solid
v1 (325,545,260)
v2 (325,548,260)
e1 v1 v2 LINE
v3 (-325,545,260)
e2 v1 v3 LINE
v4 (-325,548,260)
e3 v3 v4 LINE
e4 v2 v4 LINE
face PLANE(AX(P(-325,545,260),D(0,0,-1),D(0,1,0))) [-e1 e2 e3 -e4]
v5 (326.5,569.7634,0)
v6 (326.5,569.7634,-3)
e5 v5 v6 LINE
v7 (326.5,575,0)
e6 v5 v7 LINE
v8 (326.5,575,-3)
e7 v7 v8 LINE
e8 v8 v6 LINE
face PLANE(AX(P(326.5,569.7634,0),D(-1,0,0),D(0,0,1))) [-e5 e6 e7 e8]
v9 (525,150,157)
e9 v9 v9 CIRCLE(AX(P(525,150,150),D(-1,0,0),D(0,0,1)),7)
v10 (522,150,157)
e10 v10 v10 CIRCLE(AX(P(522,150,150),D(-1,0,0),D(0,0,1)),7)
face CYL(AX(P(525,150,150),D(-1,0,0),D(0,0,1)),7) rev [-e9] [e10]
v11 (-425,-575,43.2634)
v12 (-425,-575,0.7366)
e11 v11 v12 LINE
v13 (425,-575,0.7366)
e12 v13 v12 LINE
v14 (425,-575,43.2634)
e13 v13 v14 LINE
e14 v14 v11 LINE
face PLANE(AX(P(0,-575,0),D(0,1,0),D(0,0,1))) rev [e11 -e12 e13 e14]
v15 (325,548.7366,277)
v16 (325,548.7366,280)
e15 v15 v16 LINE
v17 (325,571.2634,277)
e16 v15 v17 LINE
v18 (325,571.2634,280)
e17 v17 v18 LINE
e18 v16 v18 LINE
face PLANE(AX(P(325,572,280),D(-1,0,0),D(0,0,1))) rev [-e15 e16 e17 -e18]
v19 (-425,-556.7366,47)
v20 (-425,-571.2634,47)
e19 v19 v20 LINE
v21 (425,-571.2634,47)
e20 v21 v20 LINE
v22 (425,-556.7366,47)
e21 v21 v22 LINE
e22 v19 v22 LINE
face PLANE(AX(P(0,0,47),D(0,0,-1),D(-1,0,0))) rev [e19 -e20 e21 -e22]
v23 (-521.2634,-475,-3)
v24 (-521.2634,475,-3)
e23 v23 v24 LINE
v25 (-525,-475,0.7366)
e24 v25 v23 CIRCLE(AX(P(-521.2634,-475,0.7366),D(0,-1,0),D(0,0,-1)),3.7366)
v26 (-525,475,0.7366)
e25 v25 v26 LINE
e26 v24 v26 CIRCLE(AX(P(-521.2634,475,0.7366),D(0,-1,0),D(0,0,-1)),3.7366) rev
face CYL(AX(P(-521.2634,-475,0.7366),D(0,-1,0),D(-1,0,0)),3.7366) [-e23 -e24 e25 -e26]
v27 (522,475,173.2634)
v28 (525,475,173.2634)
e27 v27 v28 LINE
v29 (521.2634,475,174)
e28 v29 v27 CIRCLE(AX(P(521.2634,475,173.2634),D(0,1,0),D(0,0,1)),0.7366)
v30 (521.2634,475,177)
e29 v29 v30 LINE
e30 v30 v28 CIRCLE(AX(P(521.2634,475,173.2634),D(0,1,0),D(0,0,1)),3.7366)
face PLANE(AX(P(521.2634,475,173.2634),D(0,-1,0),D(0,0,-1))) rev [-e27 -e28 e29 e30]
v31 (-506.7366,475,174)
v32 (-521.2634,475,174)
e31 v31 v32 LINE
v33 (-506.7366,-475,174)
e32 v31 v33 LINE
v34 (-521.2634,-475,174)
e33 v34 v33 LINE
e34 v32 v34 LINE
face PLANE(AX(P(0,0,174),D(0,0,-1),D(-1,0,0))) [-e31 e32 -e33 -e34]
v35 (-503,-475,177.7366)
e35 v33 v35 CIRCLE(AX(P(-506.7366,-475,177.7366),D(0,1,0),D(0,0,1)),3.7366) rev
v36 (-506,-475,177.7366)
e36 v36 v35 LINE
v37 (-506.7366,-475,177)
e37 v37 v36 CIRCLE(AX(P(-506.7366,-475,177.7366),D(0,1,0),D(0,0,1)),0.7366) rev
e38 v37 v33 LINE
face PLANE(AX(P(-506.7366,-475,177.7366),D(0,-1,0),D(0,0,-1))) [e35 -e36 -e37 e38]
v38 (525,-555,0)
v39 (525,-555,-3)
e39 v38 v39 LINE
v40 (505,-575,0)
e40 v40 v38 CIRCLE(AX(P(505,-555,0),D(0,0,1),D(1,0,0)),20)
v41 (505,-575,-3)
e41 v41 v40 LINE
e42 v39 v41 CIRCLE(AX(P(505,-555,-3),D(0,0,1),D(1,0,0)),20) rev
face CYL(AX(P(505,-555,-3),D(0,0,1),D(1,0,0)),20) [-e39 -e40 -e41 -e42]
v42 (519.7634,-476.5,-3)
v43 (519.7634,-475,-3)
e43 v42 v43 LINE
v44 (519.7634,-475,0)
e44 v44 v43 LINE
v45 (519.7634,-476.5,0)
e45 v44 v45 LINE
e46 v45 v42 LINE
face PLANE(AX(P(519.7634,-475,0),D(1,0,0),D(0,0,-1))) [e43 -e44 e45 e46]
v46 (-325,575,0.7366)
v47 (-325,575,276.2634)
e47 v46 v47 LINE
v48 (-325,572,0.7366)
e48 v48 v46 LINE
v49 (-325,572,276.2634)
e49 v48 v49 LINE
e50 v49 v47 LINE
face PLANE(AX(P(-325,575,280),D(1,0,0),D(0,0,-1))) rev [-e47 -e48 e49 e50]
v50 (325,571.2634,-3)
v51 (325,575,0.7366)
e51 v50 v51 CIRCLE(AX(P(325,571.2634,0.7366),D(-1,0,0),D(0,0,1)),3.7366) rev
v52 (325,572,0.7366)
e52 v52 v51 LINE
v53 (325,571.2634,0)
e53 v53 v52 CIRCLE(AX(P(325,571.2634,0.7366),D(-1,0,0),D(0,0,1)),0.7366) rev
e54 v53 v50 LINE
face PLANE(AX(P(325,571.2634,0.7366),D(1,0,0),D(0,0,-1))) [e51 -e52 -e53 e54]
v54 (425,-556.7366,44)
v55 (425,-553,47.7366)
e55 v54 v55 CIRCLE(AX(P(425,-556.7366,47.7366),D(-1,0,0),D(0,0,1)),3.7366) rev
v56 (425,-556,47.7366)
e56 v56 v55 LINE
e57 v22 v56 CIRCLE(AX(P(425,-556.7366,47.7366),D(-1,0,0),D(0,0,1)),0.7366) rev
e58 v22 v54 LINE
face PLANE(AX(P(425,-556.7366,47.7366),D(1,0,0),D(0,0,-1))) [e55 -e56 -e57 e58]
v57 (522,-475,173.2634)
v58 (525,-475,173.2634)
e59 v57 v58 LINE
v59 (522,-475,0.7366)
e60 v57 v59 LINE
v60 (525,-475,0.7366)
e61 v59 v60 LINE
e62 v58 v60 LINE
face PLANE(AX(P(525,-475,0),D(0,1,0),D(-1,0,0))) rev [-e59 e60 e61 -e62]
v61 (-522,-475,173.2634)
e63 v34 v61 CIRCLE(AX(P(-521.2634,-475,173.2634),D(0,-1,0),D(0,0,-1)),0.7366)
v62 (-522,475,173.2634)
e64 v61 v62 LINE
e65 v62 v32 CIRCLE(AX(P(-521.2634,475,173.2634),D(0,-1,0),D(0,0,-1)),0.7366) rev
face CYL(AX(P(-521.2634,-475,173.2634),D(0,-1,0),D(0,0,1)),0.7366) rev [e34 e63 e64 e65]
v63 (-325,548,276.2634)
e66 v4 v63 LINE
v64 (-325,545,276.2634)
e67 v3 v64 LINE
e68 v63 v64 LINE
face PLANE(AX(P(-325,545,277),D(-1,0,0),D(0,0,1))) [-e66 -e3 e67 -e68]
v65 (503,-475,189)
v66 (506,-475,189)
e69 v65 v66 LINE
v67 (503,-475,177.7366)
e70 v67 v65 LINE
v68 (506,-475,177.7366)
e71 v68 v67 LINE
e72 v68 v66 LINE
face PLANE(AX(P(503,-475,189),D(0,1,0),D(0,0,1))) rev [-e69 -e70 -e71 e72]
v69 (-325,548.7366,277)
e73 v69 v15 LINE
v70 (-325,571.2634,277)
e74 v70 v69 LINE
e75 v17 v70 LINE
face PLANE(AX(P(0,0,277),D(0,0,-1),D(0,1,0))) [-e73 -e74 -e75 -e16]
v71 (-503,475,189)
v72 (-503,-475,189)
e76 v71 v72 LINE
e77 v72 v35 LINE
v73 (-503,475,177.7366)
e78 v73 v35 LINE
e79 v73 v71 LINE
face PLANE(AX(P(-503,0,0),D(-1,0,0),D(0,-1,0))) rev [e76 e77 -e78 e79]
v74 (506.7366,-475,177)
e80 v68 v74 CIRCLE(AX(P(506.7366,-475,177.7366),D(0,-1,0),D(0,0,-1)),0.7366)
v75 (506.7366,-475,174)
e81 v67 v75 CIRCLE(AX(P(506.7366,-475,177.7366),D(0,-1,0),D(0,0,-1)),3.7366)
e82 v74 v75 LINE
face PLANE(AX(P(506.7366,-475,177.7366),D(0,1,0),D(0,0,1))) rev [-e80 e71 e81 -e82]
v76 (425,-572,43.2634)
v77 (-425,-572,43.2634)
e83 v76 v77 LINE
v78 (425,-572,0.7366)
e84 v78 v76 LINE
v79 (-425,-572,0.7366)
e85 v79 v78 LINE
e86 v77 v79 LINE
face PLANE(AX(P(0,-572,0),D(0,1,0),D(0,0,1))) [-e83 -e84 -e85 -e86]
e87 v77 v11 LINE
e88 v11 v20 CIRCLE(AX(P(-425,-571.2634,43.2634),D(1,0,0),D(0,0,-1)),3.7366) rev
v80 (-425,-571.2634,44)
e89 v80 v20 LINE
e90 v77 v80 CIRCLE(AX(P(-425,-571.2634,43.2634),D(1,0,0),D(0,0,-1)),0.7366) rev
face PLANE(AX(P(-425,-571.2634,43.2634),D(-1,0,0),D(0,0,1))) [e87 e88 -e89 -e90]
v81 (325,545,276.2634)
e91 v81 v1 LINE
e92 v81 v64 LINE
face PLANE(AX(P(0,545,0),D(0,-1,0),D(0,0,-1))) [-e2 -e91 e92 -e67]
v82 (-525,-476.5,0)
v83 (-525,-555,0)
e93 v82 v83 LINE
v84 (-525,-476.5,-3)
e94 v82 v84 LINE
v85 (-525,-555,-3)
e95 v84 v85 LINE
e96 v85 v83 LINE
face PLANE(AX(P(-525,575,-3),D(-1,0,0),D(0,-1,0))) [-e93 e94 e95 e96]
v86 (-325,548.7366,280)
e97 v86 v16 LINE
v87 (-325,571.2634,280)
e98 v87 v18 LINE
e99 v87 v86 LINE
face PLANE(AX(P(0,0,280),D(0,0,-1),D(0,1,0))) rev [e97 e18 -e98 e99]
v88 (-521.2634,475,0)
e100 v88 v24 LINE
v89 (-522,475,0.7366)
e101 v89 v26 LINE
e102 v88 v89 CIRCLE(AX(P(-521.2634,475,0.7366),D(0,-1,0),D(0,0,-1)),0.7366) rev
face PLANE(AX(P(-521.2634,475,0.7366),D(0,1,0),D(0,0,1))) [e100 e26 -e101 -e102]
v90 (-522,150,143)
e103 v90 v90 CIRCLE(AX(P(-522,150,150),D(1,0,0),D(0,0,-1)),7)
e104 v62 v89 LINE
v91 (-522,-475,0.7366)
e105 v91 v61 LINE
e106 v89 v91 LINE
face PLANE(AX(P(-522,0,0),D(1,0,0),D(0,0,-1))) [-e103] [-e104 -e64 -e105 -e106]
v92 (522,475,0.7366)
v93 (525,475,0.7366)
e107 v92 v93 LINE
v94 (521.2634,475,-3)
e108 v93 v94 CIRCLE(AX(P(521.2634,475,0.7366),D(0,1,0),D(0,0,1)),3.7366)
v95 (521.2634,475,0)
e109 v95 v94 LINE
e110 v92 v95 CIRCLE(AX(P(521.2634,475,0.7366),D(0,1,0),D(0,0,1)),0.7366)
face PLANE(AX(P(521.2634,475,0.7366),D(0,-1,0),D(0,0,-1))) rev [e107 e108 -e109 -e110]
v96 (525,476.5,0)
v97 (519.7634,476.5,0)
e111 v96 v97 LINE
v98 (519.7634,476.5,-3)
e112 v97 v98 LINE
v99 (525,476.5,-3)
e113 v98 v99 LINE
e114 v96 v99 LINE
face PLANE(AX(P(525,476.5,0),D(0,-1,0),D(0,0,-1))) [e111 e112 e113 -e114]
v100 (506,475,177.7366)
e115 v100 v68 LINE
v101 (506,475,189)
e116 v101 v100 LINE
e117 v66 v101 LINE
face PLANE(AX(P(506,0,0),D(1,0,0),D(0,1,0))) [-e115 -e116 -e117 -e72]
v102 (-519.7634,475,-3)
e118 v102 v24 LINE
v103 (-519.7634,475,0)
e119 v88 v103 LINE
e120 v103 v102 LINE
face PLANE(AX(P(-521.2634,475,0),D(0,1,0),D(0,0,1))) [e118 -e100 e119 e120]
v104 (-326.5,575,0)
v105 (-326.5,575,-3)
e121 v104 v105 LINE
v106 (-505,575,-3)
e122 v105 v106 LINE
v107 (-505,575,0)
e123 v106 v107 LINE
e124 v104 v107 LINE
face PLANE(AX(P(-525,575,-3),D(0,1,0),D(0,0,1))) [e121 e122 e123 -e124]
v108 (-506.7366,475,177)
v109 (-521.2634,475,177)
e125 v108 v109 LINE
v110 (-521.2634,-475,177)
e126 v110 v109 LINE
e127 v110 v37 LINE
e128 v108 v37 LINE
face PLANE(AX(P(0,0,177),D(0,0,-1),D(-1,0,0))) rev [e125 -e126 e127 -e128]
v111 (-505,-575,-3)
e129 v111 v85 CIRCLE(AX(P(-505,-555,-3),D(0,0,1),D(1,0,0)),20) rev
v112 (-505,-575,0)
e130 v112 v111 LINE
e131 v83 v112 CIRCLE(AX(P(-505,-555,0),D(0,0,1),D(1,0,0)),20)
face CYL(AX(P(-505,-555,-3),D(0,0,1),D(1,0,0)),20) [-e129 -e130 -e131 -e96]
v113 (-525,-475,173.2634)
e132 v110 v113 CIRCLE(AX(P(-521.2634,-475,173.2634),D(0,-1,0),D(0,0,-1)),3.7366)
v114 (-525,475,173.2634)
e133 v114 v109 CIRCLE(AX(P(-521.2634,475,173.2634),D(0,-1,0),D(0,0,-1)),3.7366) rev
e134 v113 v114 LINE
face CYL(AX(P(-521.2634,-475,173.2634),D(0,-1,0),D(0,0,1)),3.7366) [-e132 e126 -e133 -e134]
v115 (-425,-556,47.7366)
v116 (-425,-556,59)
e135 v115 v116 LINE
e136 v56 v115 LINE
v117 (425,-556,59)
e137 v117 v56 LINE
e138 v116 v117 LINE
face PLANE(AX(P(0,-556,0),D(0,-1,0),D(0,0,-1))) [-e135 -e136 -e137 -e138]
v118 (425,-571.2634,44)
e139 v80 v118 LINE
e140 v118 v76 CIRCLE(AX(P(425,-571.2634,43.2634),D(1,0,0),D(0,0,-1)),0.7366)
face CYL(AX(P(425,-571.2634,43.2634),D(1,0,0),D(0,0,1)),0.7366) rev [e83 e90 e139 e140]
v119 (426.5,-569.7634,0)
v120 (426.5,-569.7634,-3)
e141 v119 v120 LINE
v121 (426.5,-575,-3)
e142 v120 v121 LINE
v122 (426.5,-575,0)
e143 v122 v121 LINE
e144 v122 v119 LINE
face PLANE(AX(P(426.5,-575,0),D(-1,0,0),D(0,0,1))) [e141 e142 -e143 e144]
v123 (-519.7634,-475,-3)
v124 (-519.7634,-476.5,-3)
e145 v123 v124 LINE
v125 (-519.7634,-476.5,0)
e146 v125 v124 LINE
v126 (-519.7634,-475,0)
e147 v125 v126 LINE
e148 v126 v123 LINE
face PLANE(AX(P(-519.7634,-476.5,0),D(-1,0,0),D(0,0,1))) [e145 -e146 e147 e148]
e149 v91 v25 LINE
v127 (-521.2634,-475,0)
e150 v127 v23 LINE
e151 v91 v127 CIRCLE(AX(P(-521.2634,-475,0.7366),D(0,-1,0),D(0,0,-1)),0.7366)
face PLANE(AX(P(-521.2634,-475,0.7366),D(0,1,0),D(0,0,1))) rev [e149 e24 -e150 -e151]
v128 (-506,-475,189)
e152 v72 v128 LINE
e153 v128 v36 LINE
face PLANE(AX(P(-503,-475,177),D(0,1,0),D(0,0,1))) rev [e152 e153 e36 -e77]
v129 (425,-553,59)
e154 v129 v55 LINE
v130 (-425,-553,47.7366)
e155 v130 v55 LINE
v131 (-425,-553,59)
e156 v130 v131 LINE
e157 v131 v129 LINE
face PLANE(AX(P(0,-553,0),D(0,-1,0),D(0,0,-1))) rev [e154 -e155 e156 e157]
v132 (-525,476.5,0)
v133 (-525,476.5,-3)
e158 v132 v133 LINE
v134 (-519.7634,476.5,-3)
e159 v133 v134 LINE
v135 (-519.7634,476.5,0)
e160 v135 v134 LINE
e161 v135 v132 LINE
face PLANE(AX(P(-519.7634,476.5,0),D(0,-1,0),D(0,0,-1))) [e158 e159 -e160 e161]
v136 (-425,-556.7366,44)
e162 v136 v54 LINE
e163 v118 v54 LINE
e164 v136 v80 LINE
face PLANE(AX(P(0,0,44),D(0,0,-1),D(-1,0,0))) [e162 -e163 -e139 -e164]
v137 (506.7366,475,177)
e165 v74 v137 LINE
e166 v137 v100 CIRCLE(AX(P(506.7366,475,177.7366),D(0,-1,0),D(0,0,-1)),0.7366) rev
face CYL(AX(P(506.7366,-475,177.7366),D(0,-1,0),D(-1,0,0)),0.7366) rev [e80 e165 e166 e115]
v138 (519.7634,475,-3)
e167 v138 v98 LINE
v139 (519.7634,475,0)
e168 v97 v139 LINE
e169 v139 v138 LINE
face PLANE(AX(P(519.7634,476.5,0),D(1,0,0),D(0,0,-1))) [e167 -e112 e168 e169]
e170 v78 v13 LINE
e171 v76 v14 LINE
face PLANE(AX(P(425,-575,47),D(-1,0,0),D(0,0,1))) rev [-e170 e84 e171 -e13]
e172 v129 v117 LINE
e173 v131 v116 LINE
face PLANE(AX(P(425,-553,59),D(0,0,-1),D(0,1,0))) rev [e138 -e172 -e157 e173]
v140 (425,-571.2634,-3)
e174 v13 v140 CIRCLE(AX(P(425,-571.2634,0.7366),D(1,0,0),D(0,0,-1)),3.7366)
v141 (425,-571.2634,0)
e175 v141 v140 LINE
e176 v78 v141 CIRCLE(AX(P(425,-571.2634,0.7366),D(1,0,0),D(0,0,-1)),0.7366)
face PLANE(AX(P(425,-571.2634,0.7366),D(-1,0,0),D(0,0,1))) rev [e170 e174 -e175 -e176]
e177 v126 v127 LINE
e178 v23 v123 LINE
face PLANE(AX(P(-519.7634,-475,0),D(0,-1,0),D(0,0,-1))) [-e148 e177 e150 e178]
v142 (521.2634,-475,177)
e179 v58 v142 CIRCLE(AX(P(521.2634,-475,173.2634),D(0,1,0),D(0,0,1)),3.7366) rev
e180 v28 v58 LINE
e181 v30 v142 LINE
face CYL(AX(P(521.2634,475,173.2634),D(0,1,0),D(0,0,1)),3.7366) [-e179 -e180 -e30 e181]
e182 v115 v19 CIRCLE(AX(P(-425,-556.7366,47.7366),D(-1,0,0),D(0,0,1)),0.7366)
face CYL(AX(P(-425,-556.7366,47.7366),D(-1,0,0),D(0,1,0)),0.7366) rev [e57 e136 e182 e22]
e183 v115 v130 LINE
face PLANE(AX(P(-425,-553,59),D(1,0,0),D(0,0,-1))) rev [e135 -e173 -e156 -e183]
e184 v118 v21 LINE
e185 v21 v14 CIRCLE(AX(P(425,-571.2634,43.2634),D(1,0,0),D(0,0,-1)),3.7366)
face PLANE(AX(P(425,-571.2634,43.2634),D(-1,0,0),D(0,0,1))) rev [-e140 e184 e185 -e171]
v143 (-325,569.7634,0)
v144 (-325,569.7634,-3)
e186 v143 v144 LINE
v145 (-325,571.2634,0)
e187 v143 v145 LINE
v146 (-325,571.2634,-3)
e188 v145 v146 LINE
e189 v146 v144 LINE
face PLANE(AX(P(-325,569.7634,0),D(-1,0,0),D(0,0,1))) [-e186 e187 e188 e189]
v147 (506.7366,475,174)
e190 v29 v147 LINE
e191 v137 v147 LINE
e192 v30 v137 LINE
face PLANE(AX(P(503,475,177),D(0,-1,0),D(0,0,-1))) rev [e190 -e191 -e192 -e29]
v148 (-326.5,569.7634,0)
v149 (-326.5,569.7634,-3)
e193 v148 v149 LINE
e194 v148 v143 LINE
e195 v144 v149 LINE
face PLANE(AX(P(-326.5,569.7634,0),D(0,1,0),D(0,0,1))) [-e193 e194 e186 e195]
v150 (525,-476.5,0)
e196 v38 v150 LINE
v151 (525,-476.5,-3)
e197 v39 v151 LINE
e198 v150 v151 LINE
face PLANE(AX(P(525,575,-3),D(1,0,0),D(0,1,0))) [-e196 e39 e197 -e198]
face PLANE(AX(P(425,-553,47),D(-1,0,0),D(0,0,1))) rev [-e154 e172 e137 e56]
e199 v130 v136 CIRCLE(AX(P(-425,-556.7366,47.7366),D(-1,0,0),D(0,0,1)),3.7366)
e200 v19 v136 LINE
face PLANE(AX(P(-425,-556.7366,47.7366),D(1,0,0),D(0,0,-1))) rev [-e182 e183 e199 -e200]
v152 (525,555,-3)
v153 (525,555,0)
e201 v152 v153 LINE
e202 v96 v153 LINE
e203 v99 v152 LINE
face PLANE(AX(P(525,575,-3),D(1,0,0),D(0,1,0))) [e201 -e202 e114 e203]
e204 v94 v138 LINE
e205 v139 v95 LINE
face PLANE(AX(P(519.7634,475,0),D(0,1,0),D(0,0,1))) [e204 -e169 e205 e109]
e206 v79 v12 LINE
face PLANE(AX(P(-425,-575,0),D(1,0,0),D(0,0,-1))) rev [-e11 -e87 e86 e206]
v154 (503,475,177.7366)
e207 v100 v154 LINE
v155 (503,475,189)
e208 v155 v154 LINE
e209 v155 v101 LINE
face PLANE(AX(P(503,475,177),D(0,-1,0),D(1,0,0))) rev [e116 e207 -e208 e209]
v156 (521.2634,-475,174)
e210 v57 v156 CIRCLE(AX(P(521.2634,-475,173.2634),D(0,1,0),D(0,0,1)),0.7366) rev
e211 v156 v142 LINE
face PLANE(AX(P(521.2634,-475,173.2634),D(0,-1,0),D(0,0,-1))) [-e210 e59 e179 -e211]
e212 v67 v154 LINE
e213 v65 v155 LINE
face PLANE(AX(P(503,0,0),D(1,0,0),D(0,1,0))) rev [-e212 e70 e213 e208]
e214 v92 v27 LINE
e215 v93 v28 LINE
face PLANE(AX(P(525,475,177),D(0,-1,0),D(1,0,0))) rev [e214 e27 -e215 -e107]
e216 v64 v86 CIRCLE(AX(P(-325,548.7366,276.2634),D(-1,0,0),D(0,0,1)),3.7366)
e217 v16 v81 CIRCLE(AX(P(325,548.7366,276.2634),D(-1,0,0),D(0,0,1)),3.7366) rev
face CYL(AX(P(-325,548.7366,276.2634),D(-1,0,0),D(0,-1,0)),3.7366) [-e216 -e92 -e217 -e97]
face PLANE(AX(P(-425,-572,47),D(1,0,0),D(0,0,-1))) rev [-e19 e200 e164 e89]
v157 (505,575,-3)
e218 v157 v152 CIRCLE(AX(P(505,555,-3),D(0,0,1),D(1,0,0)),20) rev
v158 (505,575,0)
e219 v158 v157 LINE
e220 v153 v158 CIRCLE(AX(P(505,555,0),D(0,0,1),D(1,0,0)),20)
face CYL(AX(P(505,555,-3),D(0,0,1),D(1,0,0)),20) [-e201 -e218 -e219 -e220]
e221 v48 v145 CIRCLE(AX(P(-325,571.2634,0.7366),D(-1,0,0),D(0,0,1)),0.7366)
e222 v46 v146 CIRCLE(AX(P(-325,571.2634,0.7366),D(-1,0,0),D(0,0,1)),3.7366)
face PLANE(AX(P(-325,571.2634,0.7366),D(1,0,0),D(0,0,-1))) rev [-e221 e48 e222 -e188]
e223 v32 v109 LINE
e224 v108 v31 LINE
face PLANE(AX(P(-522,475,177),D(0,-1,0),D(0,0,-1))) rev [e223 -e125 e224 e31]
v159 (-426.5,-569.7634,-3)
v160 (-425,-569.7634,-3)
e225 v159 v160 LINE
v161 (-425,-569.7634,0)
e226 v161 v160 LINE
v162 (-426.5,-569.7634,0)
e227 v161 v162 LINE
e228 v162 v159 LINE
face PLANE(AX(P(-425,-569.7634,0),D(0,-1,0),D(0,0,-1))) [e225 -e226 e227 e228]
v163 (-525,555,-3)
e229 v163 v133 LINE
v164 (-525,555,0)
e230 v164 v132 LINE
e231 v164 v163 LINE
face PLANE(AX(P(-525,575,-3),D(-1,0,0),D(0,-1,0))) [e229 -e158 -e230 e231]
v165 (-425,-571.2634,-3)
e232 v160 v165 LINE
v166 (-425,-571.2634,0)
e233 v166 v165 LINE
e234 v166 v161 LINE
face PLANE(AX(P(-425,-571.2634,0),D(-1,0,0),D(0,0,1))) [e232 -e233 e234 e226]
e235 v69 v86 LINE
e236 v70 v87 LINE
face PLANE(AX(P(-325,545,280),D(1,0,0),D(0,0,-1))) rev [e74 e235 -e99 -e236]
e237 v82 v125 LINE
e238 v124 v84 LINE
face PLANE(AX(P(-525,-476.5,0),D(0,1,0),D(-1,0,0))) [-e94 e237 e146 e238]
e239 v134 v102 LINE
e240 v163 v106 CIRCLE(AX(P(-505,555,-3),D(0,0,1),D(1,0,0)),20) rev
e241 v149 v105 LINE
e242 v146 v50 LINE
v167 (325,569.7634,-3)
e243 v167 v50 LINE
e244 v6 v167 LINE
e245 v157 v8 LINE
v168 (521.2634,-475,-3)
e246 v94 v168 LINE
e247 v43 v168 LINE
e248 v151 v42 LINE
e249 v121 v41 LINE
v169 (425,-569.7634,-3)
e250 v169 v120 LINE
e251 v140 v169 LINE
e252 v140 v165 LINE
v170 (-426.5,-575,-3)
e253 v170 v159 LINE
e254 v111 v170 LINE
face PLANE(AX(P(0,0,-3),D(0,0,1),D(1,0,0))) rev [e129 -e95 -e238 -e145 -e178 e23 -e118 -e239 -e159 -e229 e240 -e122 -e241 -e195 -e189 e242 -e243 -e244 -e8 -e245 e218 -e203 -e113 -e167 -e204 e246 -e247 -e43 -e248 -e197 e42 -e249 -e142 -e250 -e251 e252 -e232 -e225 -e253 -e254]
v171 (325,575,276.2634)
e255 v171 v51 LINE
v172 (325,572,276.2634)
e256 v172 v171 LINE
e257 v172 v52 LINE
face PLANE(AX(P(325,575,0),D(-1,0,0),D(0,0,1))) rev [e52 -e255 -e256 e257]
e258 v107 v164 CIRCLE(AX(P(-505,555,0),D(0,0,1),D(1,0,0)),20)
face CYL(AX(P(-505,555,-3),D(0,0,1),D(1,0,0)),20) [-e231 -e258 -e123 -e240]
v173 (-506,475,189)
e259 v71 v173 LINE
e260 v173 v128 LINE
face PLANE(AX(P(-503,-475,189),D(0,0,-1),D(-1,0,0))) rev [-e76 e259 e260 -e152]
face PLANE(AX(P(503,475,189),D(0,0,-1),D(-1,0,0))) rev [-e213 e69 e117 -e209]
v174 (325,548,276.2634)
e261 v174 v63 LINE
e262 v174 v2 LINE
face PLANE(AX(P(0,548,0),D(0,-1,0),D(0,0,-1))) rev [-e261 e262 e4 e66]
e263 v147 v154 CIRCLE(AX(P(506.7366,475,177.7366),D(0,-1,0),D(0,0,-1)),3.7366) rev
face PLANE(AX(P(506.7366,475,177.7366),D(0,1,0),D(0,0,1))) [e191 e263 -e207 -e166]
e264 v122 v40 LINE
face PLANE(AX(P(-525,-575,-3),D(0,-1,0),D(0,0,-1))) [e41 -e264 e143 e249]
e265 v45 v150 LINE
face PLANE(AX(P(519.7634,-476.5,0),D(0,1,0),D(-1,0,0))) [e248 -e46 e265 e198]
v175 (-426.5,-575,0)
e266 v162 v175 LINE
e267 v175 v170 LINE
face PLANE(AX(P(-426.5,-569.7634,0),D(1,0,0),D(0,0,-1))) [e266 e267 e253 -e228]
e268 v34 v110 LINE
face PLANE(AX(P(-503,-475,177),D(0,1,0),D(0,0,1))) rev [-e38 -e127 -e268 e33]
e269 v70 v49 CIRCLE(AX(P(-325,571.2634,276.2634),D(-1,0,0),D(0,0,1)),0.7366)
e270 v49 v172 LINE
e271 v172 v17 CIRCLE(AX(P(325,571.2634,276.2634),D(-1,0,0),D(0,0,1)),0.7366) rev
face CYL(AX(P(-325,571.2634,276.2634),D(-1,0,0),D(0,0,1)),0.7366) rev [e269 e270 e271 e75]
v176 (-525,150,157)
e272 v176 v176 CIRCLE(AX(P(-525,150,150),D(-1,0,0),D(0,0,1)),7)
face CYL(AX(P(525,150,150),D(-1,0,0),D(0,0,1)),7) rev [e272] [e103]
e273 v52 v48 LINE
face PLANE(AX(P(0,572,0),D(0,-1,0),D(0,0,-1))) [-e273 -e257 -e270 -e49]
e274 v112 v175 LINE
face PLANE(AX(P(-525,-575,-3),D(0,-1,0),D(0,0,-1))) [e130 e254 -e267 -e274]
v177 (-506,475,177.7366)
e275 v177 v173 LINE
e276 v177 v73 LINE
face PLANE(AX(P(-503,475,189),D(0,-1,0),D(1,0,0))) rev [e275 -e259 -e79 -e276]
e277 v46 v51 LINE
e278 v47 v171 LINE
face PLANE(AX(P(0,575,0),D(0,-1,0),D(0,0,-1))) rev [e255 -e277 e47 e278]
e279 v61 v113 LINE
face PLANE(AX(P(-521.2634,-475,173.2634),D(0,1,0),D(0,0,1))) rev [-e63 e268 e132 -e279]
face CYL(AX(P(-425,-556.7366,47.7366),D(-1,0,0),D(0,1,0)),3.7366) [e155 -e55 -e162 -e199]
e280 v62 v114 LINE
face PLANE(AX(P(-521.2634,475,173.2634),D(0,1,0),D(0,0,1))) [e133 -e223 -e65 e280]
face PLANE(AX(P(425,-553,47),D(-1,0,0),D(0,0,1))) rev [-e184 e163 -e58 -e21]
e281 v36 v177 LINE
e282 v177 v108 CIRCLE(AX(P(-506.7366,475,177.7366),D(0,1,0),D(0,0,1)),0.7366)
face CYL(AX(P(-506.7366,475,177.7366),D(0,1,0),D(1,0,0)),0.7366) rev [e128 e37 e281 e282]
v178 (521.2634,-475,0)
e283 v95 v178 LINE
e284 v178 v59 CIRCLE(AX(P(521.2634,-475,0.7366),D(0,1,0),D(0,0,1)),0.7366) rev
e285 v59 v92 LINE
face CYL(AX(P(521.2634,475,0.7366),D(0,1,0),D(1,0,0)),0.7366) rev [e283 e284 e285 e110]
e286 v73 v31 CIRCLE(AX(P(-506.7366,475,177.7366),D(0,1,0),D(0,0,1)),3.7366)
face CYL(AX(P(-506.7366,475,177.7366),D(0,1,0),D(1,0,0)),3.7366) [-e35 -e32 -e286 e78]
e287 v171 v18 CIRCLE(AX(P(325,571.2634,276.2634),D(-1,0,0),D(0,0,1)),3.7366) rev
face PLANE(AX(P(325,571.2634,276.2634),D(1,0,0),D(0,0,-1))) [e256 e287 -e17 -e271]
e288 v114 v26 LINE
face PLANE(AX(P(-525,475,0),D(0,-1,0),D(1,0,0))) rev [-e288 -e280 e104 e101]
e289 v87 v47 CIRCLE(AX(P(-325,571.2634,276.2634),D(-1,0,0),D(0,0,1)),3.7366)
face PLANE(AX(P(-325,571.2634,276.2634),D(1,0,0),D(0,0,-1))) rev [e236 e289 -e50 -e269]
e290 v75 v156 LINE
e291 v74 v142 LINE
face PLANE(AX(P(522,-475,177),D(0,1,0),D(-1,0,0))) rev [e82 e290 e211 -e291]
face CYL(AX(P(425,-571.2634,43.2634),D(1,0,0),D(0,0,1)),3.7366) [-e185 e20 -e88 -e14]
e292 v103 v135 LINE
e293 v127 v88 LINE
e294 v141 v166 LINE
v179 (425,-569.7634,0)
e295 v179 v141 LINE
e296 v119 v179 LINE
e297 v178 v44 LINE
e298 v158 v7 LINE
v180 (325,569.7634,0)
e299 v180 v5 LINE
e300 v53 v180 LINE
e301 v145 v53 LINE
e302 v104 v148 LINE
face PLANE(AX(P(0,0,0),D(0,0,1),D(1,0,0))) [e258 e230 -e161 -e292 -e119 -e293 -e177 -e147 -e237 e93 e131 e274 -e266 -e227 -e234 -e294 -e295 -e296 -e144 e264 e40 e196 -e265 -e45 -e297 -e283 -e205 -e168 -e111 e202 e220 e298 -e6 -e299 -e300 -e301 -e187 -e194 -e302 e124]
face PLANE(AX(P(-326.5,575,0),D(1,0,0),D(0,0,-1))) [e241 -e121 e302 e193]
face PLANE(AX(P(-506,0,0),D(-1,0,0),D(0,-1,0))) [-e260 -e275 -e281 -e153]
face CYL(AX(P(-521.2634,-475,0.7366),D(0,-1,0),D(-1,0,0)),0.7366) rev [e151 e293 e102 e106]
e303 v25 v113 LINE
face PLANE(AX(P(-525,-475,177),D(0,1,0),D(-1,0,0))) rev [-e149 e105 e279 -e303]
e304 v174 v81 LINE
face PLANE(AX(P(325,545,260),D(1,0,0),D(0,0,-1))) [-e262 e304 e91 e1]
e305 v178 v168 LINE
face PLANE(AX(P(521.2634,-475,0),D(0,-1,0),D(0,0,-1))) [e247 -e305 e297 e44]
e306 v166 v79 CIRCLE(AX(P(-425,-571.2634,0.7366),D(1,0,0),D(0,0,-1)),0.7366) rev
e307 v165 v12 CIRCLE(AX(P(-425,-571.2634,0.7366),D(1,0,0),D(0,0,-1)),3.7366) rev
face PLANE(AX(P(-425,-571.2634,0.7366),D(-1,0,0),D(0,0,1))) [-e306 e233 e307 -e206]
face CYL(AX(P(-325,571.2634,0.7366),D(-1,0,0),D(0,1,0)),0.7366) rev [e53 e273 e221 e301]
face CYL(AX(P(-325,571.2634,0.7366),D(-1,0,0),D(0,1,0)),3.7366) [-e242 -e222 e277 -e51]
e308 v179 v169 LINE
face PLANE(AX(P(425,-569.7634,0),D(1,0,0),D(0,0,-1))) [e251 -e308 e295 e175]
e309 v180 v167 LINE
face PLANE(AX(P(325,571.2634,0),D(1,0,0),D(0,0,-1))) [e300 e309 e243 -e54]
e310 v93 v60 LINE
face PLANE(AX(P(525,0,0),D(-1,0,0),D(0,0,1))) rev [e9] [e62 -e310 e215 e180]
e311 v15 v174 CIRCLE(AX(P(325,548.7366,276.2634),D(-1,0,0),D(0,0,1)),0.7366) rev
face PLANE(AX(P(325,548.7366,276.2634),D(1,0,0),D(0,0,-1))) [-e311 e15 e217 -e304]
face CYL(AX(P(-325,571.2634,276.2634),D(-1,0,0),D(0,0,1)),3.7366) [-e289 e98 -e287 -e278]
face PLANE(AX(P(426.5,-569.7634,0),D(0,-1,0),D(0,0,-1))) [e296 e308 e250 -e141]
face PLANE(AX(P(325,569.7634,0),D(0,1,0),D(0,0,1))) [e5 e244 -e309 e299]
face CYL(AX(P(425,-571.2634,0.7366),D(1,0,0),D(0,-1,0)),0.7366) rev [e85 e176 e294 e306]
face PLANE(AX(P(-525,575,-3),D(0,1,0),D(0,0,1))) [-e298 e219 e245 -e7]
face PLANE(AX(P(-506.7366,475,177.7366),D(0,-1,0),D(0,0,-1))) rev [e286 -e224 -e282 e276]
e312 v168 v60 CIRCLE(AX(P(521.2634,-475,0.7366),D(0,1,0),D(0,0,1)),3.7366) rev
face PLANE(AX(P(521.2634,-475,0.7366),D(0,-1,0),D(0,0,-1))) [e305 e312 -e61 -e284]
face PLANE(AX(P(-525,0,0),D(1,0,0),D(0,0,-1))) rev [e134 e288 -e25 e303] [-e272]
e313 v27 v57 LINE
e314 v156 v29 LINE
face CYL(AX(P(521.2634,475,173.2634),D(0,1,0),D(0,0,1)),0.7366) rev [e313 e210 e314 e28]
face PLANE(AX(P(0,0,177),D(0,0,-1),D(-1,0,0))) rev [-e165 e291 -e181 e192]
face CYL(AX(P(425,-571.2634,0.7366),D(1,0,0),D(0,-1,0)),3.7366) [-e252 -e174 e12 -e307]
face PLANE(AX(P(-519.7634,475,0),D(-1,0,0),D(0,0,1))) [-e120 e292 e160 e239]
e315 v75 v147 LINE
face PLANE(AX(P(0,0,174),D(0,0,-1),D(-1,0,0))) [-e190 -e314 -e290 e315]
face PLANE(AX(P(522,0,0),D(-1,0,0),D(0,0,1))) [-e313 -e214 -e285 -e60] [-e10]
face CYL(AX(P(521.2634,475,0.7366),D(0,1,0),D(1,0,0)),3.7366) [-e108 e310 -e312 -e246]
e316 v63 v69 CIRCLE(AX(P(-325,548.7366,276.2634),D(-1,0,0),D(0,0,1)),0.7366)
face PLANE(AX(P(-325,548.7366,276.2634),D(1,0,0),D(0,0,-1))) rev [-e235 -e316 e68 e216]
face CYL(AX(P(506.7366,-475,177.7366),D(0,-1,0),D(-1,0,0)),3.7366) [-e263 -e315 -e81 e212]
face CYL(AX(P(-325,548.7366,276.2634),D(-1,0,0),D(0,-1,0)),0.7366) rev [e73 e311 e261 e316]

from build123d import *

# Parameters (mm, degrees)
SKETCH_2_W                          = 1050
SKETCH_2_H                          = 1150
SM_BASE_FLANGE_1_DEPTH              = 3
SM_EDGE_FLANGE_1_STRIP_W            = 13.4732
SM_EDGE_FLANGE_1_STRIP_H            = 3
SM_EDGE_FLANGE_1_STRIP_CUT_DEPTH    = 950
SM_EDGE_FLANGE_1_RELIEF_W           = 14.9732
SM_EDGE_FLANGE_1_RELIEF_H           = 1.5
SM_EDGE_FLANGE_1_RELIEF_CUT_DEPTH   = 3
SM_EDGE_FLANGE_1_STRIP_2_W          = 13.4732
SM_EDGE_FLANGE_1_STRIP_2_H          = 3
SM_EDGE_FLANGE_1_STRIP_CUT_2_DEPTH  = 950
SM_EDGE_FLANGE_1_RELIEF_2_W         = 14.9732
SM_EDGE_FLANGE_1_RELIEF_2_H         = 1.5
SM_EDGE_FLANGE_1_RELIEF_CUT_2_DEPTH = 3
SM_EDGE_FLANGE_1_DEPTH              = 950
SM_EDGE_FLANGE_1_BEND_DEPTH         = 950
SM_EDGE_FLANGE_4_STRIP_W            = 13.4732
SM_EDGE_FLANGE_4_STRIP_H            = 3
SM_EDGE_FLANGE_4_STRIP_CUT_DEPTH    = 850
SM_EDGE_FLANGE_4_RELIEF_W           = 14.9732
SM_EDGE_FLANGE_4_RELIEF_H           = 1.5
SM_EDGE_FLANGE_4_RELIEF_CUT_DEPTH   = 3
SM_EDGE_FLANGE_4_DEPTH              = 850
SM_EDGE_FLANGE_5_STRIP_W            = 13.4732
SM_EDGE_FLANGE_5_STRIP_H            = 3
SM_EDGE_FLANGE_5_STRIP_CUT_DEPTH    = 650
SM_EDGE_FLANGE_5_RELIEF_W           = 14.9732
SM_EDGE_FLANGE_5_RELIEF_H           = 1.5
SM_EDGE_FLANGE_5_RELIEF_CUT_DEPTH   = 3
SM_EDGE_FLANGE_5_DEPTH              = 650
SM_EDGE_FLANGE_2_STRIP_W            = 13.4732
SM_EDGE_FLANGE_2_STRIP_H            = 3
SM_EDGE_FLANGE_2_STRIP_CUT_DEPTH    = 950
SM_EDGE_FLANGE_2_STRIP_2_W          = 13.4732
SM_EDGE_FLANGE_2_STRIP_2_H          = 3
SM_EDGE_FLANGE_2_STRIP_CUT_2_DEPTH  = 950
SM_EDGE_FLANGE_2_STRIP_3_W          = 13.4732
SM_EDGE_FLANGE_2_STRIP_3_H          = 3
SM_EDGE_FLANGE_2_STRIP_CUT_3_DEPTH  = 850
SM_EDGE_FLANGE_2_DEPTH              = 950
SM_EDGE_FLANGE_2_BEND_DEPTH         = 950
SM_EDGE_FLANGE_2_BEND_2_DEPTH       = 850
SM_EDGE_FLANGE_3_STRIP_W            = 13.4732
SM_EDGE_FLANGE_3_STRIP_H            = 3
SM_EDGE_FLANGE_3_STRIP_CUT_DEPTH    = 950
SM_EDGE_FLANGE_3_STRIP_2_W          = 13.4732
SM_EDGE_FLANGE_3_STRIP_2_H          = 3
SM_EDGE_FLANGE_3_STRIP_CUT_2_DEPTH  = 950
SM_EDGE_FLANGE_3_STRIP_3_W          = 13.4732
SM_EDGE_FLANGE_3_STRIP_3_H          = 3
SM_EDGE_FLANGE_3_STRIP_CUT_3_DEPTH  = 850
SM_EDGE_FLANGE_3_DEPTH              = 950
SM_EDGE_FLANGE_3_BEND_DEPTH         = 950
SM_EDGE_FLANGE_3_BEND_2_DEPTH       = 850
FILLET_1_R                          = 20
SM_EDGE_FLANGE_6_STRIP_W            = 13.4732
SM_EDGE_FLANGE_6_STRIP_H            = 3
SM_EDGE_FLANGE_6_STRIP_CUT_DEPTH    = 650
SM_EDGE_FLANGE_6_DEPTH              = 650
SM_EDGE_FLANGE_7_STRIP_W            = 13.4732
SM_EDGE_FLANGE_7_STRIP_H            = 3
SM_EDGE_FLANGE_7_STRIP_CUT_DEPTH    = 650
SM_EDGE_FLANGE_7_DEPTH              = 650
SKETCH_60_R                         = 7
CUT_EXTRUDE_1_DEPTH                 = 1230.440929854


# Sheet-metal steps are written as plain solids
with BuildPart() as part:
    # Sketch 2 → 基体-法兰1 (new body)
    with BuildSketch(Plane.XY):
        Rectangle(SKETCH_2_W, SKETCH_2_H)
    extrude(amount=-SM_BASE_FLANGE_1_DEPTH)

    # 边线-法兰1 strip (across the edge) → 边线-法兰1 strip cut (cut)
    with BuildSketch(Plane(origin=(-525, 475, 0), x_dir=(1, 0, 0), z_dir=(0, -1, 0))):
        with Locations((-3, -1.5)):
            Rectangle(SM_EDGE_FLANGE_1_STRIP_W, SM_EDGE_FLANGE_1_STRIP_H)
    extrude(amount=SM_EDGE_FLANGE_1_STRIP_CUT_DEPTH, mode=Mode.SUBTRACT)

    # 边线-法兰1 relief (on the sheet) → 边线-法兰1 relief cut (cut)
    with BuildSketch(Plane(origin=(-521.2634, 475, 0), x_dir=(1, 0, 0), z_dir=(0, 0, 1))):
        with Locations((-5.9866, 0.75)):
            Rectangle(SM_EDGE_FLANGE_1_RELIEF_W, SM_EDGE_FLANGE_1_RELIEF_H)
        with Locations((-5.9866, -950.75)):
            Rectangle(SM_EDGE_FLANGE_1_RELIEF_W, SM_EDGE_FLANGE_1_RELIEF_H)
    extrude(amount=-SM_EDGE_FLANGE_1_RELIEF_CUT_DEPTH, mode=Mode.SUBTRACT)

    # 边线-法兰1 strip 2 (across the edge) → 边线-法兰1 strip cut 2 (cut)
    with BuildSketch(Plane(origin=(525, -475, 0), x_dir=(-1, 0, 0), z_dir=(0, 1, 0))):
        with Locations((-3, -1.5)):
            Rectangle(SM_EDGE_FLANGE_1_STRIP_2_W, SM_EDGE_FLANGE_1_STRIP_2_H)
    extrude(amount=SM_EDGE_FLANGE_1_STRIP_CUT_2_DEPTH, mode=Mode.SUBTRACT)

    # 边线-法兰1 relief 2 (on the sheet) → 边线-法兰1 relief cut 2 (cut)
    with BuildSketch(Plane(origin=(521.2634, -475, 0), x_dir=(-1, 0, 0), z_dir=(0, 0, 1))):
        with Locations((-5.9866, 0.75)):
            Rectangle(SM_EDGE_FLANGE_1_RELIEF_2_W, SM_EDGE_FLANGE_1_RELIEF_2_H)
        with Locations((-5.9866, -950.75)):
            Rectangle(SM_EDGE_FLANGE_1_RELIEF_2_W, SM_EDGE_FLANGE_1_RELIEF_2_H)
    extrude(amount=-SM_EDGE_FLANGE_1_RELIEF_CUT_2_DEPTH, mode=Mode.SUBTRACT)

    # 边线-法兰1 section (across the edge) → 边线-法兰1 (add)
    with BuildSketch(Plane(origin=(-525, 475, 0), x_dir=(1, 0, 0), z_dir=(0, -1, 0))):
        with BuildLine():
            Line((0, 0.7366), (0, 177))
            Line((0, 177), (3, 177))
            Line((3, 177), (3, 0.7366))
            ThreePointArc((3, 0.7366), (3.215745145, 0.215745145), (3.7366, 0))
            Line((3.7366, 0), (3.7366, -3))
            ThreePointArc((3.7366, -3), (1.094424801, -1.905575199), (0, 0.7366))
        make_face()
    extrude(amount=SM_EDGE_FLANGE_1_DEPTH)

    # 边线-法兰1 section 2 (across the edge) → 边线-法兰1 bend (add)
    with BuildSketch(Plane(origin=(525, -475, 0), x_dir=(-1, 0, 0), z_dir=(0, 1, 0))):
        with BuildLine():
            Line((0, 0.7366), (0, 177))
            Line((0, 177), (3, 177))
            Line((3, 177), (3, 0.7366))
            ThreePointArc((3, 0.7366), (3.215745145, 0.215745145), (3.7366, 0))
            Line((3.7366, 0), (3.7366, -3))
            ThreePointArc((3.7366, -3), (1.094424801, -1.905575199), (0, 0.7366))
        make_face()
    extrude(amount=SM_EDGE_FLANGE_1_BEND_DEPTH)

    # 边线-法兰4 strip (across the edge) → 边线-法兰4 strip cut (cut)
    with BuildSketch(Plane(origin=(-425, -575, 0), x_dir=(0, 1, 0), z_dir=(1, 0, 0))):
        with Locations((-3, -1.5)):
            Rectangle(SM_EDGE_FLANGE_4_STRIP_W, SM_EDGE_FLANGE_4_STRIP_H)
    extrude(amount=SM_EDGE_FLANGE_4_STRIP_CUT_DEPTH, mode=Mode.SUBTRACT)

    # 边线-法兰4 relief (on the sheet) → 边线-法兰4 relief cut (cut)
    with BuildSketch(Plane(origin=(-425, -571.2634, 0), x_dir=(0, 1, 0), z_dir=(0, 0, 1))):
        with Locations((-5.9866, 0.75)):
            Rectangle(SM_EDGE_FLANGE_4_RELIEF_W, SM_EDGE_FLANGE_4_RELIEF_H)
        with Locations((-5.9866, -850.75)):
            Rectangle(SM_EDGE_FLANGE_4_RELIEF_W, SM_EDGE_FLANGE_4_RELIEF_H)
    extrude(amount=-SM_EDGE_FLANGE_4_RELIEF_CUT_DEPTH, mode=Mode.SUBTRACT)

    # 边线-法兰4 section (across the edge) → 边线-法兰4 (add)
    with BuildSketch(Plane(origin=(-425, -575, 0), x_dir=(0, 1, 0), z_dir=(1, 0, 0))):
        with BuildLine():
            Line((0, 0.7366), (0, 47))
            Line((0, 47), (3, 47))
            Line((3, 47), (3, 0.7366))
            ThreePointArc((3, 0.7366), (3.215745145, 0.215745145), (3.7366, 0))
            Line((3.7366, 0), (3.7366, -3))
            ThreePointArc((3.7366, -3), (1.094424801, -1.905575199), (0, 0.7366))
        make_face()
    extrude(amount=SM_EDGE_FLANGE_4_DEPTH)

    # 边线-法兰5 strip (across the edge) → 边线-法兰5 strip cut (cut)
    with BuildSketch(Plane(origin=(325, 575, 0), x_dir=(0, -1, 0), z_dir=(-1, 0, 0))):
        with Locations((-3, -1.5)):
            Rectangle(SM_EDGE_FLANGE_5_STRIP_W, SM_EDGE_FLANGE_5_STRIP_H)
    extrude(amount=SM_EDGE_FLANGE_5_STRIP_CUT_DEPTH, mode=Mode.SUBTRACT)

    # 边线-法兰5 relief (on the sheet) → 边线-法兰5 relief cut (cut)
    with BuildSketch(Plane(origin=(325, 571.2634, 0), x_dir=(0, -1, 0), z_dir=(0, 0, 1))):
        with Locations((-5.9866, 0.75)):
            Rectangle(SM_EDGE_FLANGE_5_RELIEF_W, SM_EDGE_FLANGE_5_RELIEF_H)
        with Locations((-5.9866, -650.75)):
            Rectangle(SM_EDGE_FLANGE_5_RELIEF_W, SM_EDGE_FLANGE_5_RELIEF_H)
    extrude(amount=-SM_EDGE_FLANGE_5_RELIEF_CUT_DEPTH, mode=Mode.SUBTRACT)

    # 边线-法兰5 section (across the edge) → 边线-法兰5 (add)
    with BuildSketch(Plane(origin=(325, 575, 0), x_dir=(0, -1, 0), z_dir=(-1, 0, 0))):
        with BuildLine():
            Line((0, 0.7366), (0, 280))
            Line((0, 280), (3, 280))
            Line((3, 280), (3, 0.7366))
            ThreePointArc((3, 0.7366), (3.215745145, 0.215745145), (3.7366, 0))
            Line((3.7366, 0), (3.7366, -3))
            ThreePointArc((3.7366, -3), (1.094424801, -1.905575199), (0, 0.7366))
        make_face()
    extrude(amount=SM_EDGE_FLANGE_5_DEPTH)

    # 边线-法兰2 strip (across the edge) → 边线-法兰2 strip cut (cut)
    with BuildSketch(Plane(origin=(-522, 475, 177), x_dir=(0, 0, -1), z_dir=(0, -1, 0))):
        with Locations((-3, -1.5)):
            Rectangle(SM_EDGE_FLANGE_2_STRIP_W, SM_EDGE_FLANGE_2_STRIP_H)
    extrude(amount=SM_EDGE_FLANGE_2_STRIP_CUT_DEPTH, mode=Mode.SUBTRACT)

    # 边线-法兰2 strip 2 (across the edge) → 边线-法兰2 strip cut 2 (cut)
    with BuildSketch(Plane(origin=(522, -475, 177), x_dir=(0, 0, -1), z_dir=(0, 1, 0))):
        with Locations((-3, -1.5)):
            Rectangle(SM_EDGE_FLANGE_2_STRIP_2_W, SM_EDGE_FLANGE_2_STRIP_2_H)
    extrude(amount=SM_EDGE_FLANGE_2_STRIP_CUT_2_DEPTH, mode=Mode.SUBTRACT)

    # 边线-法兰2 strip 3 (across the edge) → 边线-法兰2 strip cut 3 (cut)
    with BuildSketch(Plane(origin=(-425, -572, 47), x_dir=(0, 0, -1), z_dir=(1, 0, 0))):
        with Locations((-3, -1.5)):
            Rectangle(SM_EDGE_FLANGE_2_STRIP_3_W, SM_EDGE_FLANGE_2_STRIP_3_H)
    extrude(amount=SM_EDGE_FLANGE_2_STRIP_CUT_3_DEPTH, mode=Mode.SUBTRACT)

    # 边线-法兰2 section (across the edge) → 边线-法兰2 (add)
    with BuildSketch(Plane(origin=(-522, 475, 177), x_dir=(0, 0, -1), z_dir=(0, -1, 0))):
        with BuildLine():
            Line((0, 0.7366), (0, 19))
            Line((0, 19), (3, 19))
            Line((3, 19), (3, 0.7366))
            ThreePointArc((3, 0.7366), (3.215745145, 0.215745145), (3.7366, 0))
            Line((3.7366, 0), (3.7366, -3))
            ThreePointArc((3.7366, -3), (1.094424801, -1.905575199), (0, 0.7366))
        make_face()
    extrude(amount=SM_EDGE_FLANGE_2_DEPTH)

    # 边线-法兰2 section 2 (across the edge) → 边线-法兰2 bend (add)
    with BuildSketch(Plane(origin=(522, -475, 177), x_dir=(0, 0, -1), z_dir=(0, 1, 0))):
        with BuildLine():
            Line((0, 0.7366), (0, 19))
            Line((0, 19), (3, 19))
            Line((3, 19), (3, 0.7366))
            ThreePointArc((3, 0.7366), (3.215745145, 0.215745145), (3.7366, 0))
            Line((3.7366, 0), (3.7366, -3))
            ThreePointArc((3.7366, -3), (1.094424801, -1.905575199), (0, 0.7366))
        make_face()
    extrude(amount=SM_EDGE_FLANGE_2_BEND_DEPTH)

    # 边线-法兰2 section 3 (across the edge) → 边线-法兰2 bend 2 (add)
    with BuildSketch(Plane(origin=(-425, -572, 47), x_dir=(0, 0, -1), z_dir=(1, 0, 0))):
        with BuildLine():
            Line((0, 0.7366), (0, 19))
            Line((0, 19), (3, 19))
            Line((3, 19), (3, 0.7366))
            ThreePointArc((3, 0.7366), (3.215745145, 0.215745145), (3.7366, 0))
            Line((3.7366, 0), (3.7366, -3))
            ThreePointArc((3.7366, -3), (1.094424801, -1.905575199), (0, 0.7366))
        make_face()
    extrude(amount=SM_EDGE_FLANGE_2_BEND_2_DEPTH)

    # 边线-法兰3 strip (across the edge) → 边线-法兰3 strip cut (cut)
    with BuildSketch(Plane(origin=(-503, -475, 177), x_dir=(-1, 0, 0), z_dir=(0, 1, 0))):
        with Locations((-3, -1.5)):
            Rectangle(SM_EDGE_FLANGE_3_STRIP_W, SM_EDGE_FLANGE_3_STRIP_H)
    extrude(amount=SM_EDGE_FLANGE_3_STRIP_CUT_DEPTH, mode=Mode.SUBTRACT)

    # 边线-法兰3 strip 2 (across the edge) → 边线-法兰3 strip cut 2 (cut)
    with BuildSketch(Plane(origin=(503, 475, 177), x_dir=(1, 0, 0), z_dir=(0, -1, 0))):
        with Locations((-3, -1.5)):
            Rectangle(SM_EDGE_FLANGE_3_STRIP_2_W, SM_EDGE_FLANGE_3_STRIP_2_H)
    extrude(amount=SM_EDGE_FLANGE_3_STRIP_CUT_2_DEPTH, mode=Mode.SUBTRACT)

    # 边线-法兰3 strip 3 (across the edge) → 边线-法兰3 strip cut 3 (cut)
    with BuildSketch(Plane(origin=(425, -553, 47), x_dir=(0, -1, 0), z_dir=(-1, 0, 0))):
        with Locations((-3, -1.5)):
            Rectangle(SM_EDGE_FLANGE_3_STRIP_3_W, SM_EDGE_FLANGE_3_STRIP_3_H)
    extrude(amount=SM_EDGE_FLANGE_3_STRIP_CUT_3_DEPTH, mode=Mode.SUBTRACT)

    # 边线-法兰3 section (across the edge) → 边线-法兰3 (add)
    with BuildSketch(Plane(origin=(-503, -475, 177), x_dir=(-1, 0, 0), z_dir=(0, 1, 0))):
        with BuildLine():
            Line((0, 0.7366), (0, 12))
            Line((0, 12), (3, 12))
            Line((3, 12), (3, 0.7366))
            ThreePointArc((3, 0.7366), (3.215745145, 0.215745145), (3.7366, 0))
            Line((3.7366, 0), (3.7366, -3))
            ThreePointArc((3.7366, -3), (1.094424801, -1.905575199), (0, 0.7366))
        make_face()
    extrude(amount=SM_EDGE_FLANGE_3_DEPTH)

    # 边线-法兰3 section 2 (across the edge) → 边线-法兰3 bend (add)
    with BuildSketch(Plane(origin=(503, 475, 177), x_dir=(1, 0, 0), z_dir=(0, -1, 0))):
        with BuildLine():
            Line((0, 0.7366), (0, 12))
            Line((0, 12), (3, 12))
            Line((3, 12), (3, 0.7366))
            ThreePointArc((3, 0.7366), (3.215745145, 0.215745145), (3.7366, 0))
            Line((3.7366, 0), (3.7366, -3))
            ThreePointArc((3.7366, -3), (1.094424801, -1.905575199), (0, 0.7366))
        make_face()
    extrude(amount=SM_EDGE_FLANGE_3_BEND_DEPTH)

    # 边线-法兰3 section 3 (across the edge) → 边线-法兰3 bend 2 (add)
    with BuildSketch(Plane(origin=(425, -553, 47), x_dir=(0, -1, 0), z_dir=(-1, 0, 0))):
        with BuildLine():
            Line((0, 0.7366), (0, 12))
            Line((0, 12), (3, 12))
            Line((3, 12), (3, 0.7366))
            ThreePointArc((3, 0.7366), (3.215745145, 0.215745145), (3.7366, 0))
            Line((3.7366, 0), (3.7366, -3))
            ThreePointArc((3.7366, -3), (1.094424801, -1.905575199), (0, 0.7366))
        make_face()
    extrude(amount=SM_EDGE_FLANGE_3_BEND_2_DEPTH)

    # 圆角1
    fillet_1_edges = [part.edges().sort_by_distance(p)[0] for p in [
        (525, -575, -1.5),
        (-525, -575, -1.5),
        (-525, 575, -1.5),
        (525, 575, -1.5),
    ]]
    fillet(fillet_1_edges, radius=FILLET_1_R)

    # 边线-法兰6 strip (across the edge) → 边线-法兰6 strip cut (cut)
    with BuildSketch(Plane(origin=(325, 572, 280), x_dir=(0, 0, -1), z_dir=(-1, 0, 0))):
        with Locations((-3, -1.5)):
            Rectangle(SM_EDGE_FLANGE_6_STRIP_W, SM_EDGE_FLANGE_6_STRIP_H)
    extrude(amount=SM_EDGE_FLANGE_6_STRIP_CUT_DEPTH, mode=Mode.SUBTRACT)

    # 边线-法兰6 section (across the edge) → 边线-法兰6 (add)
    with BuildSketch(Plane(origin=(325, 572, 280), x_dir=(0, 0, -1), z_dir=(-1, 0, 0))):
        with BuildLine():
            Line((0, 0.7366), (0, 27))
            Line((0, 27), (3, 27))
            Line((3, 27), (3, 0.7366))
            ThreePointArc((3, 0.7366), (3.215745145, 0.215745145), (3.7366, 0))
            Line((3.7366, 0), (3.7366, -3))
            ThreePointArc((3.7366, -3), (1.094424801, -1.905575199), (0, 0.7366))
        make_face()
    extrude(amount=SM_EDGE_FLANGE_6_DEPTH)

    # 边线-法兰7 strip (across the edge) → 边线-法兰7 strip cut (cut)
    with BuildSketch(Plane(origin=(325, 545, 277), x_dir=(0, 1, 0), z_dir=(-1, 0, 0))):
        with Locations((-3, -1.5)):
            Rectangle(SM_EDGE_FLANGE_7_STRIP_W, SM_EDGE_FLANGE_7_STRIP_H)
    extrude(amount=SM_EDGE_FLANGE_7_STRIP_CUT_DEPTH, mode=Mode.SUBTRACT)

    # 边线-法兰7 section (across the edge) → 边线-法兰7 (add)
    with BuildSketch(Plane(origin=(325, 545, 277), x_dir=(0, 1, 0), z_dir=(-1, 0, 0))):
        with BuildLine():
            Line((0, 0.7366), (0, 17))
            Line((0, 17), (3, 17))
            Line((3, 17), (3, 0.7366))
            ThreePointArc((3, 0.7366), (3.215745145, 0.215745145), (3.7366, 0))
            Line((3.7366, 0), (3.7366, -3))
            ThreePointArc((3.7366, -3), (1.094424801, -1.905575199), (0, 0.7366))
        make_face()
    extrude(amount=SM_EDGE_FLANGE_7_DEPTH)

    # 草图60 → 切除-拉伸1 (cut, through all)
    with BuildSketch(Plane.ZY.offset(525)):
        with Locations((150, 150)):
            Circle(SKETCH_60_R)
    extrude(amount=-CUT_EXTRUDE_1_DEPTH, mode=Mode.SUBTRACT)


solid = part.part
